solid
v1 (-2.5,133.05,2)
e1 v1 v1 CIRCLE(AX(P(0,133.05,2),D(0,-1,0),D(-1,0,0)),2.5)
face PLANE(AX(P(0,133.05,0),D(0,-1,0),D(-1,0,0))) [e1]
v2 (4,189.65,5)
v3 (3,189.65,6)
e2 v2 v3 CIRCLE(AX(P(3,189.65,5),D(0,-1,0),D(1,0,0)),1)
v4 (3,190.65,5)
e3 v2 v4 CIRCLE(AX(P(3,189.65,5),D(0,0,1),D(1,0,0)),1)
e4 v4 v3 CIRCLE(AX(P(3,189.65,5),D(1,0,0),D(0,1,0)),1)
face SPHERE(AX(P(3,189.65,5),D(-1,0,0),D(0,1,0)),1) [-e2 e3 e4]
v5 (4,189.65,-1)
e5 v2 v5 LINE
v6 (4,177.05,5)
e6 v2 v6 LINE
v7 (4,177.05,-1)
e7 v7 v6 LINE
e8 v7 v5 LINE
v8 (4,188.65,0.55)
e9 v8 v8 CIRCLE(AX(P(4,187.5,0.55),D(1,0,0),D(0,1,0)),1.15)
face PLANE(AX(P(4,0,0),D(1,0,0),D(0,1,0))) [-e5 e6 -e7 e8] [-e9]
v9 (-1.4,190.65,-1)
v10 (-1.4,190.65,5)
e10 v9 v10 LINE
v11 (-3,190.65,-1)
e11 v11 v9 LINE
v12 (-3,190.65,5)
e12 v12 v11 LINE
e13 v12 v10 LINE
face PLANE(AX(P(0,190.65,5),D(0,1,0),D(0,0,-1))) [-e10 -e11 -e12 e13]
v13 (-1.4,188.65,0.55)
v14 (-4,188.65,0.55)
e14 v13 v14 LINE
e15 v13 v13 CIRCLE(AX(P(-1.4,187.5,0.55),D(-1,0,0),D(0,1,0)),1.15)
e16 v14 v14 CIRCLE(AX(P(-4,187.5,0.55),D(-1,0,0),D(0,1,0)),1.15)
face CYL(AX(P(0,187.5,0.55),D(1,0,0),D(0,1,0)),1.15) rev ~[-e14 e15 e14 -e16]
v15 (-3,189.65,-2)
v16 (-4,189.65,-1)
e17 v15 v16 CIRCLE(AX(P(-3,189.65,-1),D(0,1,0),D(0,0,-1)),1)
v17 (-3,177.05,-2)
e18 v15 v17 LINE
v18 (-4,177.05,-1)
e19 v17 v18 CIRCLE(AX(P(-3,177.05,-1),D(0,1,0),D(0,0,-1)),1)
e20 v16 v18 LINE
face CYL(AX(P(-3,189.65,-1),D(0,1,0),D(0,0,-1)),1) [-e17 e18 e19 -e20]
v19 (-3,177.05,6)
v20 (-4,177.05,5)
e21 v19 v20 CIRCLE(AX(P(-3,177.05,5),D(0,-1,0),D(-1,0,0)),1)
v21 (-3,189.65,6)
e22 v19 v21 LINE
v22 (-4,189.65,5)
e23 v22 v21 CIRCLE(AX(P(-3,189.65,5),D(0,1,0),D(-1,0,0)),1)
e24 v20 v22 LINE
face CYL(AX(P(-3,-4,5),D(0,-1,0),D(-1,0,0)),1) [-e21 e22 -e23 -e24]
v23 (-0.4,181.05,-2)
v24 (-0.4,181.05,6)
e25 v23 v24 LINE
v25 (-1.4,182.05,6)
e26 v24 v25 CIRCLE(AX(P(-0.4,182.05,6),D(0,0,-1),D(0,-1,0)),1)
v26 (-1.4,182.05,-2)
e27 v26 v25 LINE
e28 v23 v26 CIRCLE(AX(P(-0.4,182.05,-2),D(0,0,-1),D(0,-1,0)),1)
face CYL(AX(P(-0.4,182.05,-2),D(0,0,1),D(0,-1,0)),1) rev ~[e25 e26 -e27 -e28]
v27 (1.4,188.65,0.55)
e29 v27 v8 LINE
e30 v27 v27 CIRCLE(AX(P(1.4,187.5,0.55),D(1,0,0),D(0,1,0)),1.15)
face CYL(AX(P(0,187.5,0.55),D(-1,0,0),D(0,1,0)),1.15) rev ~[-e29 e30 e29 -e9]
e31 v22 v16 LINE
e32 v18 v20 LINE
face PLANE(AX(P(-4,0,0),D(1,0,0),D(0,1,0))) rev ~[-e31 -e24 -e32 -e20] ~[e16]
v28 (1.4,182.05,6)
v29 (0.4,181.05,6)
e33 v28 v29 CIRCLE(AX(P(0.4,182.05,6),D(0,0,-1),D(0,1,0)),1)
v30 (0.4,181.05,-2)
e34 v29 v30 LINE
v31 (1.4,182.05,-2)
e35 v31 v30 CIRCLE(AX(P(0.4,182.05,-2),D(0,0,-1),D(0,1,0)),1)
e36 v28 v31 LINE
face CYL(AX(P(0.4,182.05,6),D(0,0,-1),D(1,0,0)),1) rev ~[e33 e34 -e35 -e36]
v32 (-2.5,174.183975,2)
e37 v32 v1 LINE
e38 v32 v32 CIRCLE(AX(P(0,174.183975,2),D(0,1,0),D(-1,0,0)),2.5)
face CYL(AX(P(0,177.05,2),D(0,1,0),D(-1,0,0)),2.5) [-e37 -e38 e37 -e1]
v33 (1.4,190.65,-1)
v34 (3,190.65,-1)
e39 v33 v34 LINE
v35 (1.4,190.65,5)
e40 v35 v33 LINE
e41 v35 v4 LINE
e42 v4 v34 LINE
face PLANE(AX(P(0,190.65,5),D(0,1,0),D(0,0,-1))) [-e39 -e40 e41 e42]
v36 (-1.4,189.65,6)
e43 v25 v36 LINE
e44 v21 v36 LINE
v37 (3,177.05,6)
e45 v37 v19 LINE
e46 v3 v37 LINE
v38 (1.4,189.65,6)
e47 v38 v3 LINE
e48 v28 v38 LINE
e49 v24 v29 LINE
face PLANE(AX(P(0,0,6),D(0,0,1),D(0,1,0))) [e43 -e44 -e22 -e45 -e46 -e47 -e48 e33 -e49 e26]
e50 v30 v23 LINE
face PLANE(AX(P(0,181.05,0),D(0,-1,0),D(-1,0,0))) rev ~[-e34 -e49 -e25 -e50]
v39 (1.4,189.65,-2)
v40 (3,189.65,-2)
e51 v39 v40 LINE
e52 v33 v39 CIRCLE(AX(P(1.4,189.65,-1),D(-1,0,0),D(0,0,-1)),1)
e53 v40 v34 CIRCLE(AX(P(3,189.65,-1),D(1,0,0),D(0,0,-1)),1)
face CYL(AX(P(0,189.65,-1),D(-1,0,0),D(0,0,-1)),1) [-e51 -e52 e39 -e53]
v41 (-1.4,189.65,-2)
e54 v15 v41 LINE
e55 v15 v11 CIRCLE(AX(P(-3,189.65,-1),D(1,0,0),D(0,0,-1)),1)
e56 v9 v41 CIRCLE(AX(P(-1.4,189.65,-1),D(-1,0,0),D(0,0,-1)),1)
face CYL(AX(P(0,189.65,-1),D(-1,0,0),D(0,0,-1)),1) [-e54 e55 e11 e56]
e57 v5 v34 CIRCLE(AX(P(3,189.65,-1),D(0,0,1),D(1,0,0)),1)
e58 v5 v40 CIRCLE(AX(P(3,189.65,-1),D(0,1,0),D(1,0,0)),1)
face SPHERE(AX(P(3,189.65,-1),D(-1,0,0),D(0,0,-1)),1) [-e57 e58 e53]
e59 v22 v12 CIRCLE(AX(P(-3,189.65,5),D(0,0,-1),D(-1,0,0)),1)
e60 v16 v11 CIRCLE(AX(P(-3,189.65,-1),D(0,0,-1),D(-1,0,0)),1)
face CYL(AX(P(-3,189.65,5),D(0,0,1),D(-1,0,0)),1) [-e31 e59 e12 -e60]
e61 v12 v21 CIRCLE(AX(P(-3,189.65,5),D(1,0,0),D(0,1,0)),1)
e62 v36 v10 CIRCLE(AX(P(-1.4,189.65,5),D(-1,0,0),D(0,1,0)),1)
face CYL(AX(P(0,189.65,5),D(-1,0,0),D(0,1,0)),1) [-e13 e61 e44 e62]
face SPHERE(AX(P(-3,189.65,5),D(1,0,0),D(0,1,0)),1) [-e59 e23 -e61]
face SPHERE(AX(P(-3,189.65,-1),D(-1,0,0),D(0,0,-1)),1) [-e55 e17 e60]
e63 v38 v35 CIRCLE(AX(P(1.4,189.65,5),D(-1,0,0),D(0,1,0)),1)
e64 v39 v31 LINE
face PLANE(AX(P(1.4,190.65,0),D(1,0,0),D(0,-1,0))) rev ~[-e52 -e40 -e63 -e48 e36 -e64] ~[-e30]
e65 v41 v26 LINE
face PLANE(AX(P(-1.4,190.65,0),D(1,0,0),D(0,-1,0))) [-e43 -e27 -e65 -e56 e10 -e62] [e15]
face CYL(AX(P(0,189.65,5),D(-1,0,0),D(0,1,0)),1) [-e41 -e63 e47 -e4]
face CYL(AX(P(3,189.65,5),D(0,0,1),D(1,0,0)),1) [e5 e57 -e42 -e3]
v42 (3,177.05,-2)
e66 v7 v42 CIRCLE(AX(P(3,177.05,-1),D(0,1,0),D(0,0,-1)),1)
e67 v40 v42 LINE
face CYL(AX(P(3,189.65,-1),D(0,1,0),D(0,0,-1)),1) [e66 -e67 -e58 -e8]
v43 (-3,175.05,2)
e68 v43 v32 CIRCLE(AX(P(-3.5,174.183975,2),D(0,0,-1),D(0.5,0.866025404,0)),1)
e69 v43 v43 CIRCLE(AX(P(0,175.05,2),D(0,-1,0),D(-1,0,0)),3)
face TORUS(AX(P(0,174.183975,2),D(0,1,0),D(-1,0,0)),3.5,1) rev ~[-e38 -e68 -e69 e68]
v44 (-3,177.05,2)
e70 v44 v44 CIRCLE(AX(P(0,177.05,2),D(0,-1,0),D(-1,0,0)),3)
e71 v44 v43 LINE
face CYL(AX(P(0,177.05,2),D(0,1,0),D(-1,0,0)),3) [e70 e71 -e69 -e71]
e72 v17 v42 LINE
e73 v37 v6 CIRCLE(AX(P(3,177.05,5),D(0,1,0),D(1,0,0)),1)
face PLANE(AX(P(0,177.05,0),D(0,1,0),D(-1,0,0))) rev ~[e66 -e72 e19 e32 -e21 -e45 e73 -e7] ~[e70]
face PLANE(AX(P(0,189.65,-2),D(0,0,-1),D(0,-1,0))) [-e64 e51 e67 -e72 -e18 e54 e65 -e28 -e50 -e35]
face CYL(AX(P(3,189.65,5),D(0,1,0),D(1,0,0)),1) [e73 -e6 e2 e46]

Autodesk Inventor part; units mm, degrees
ref_plane "YZ Plane" through (0, 0, 0) normal (1, 0, 0) x (0, 1, 0)
ref_plane "XY Plane" through (0, 0, 0) normal (0, 0, 1) x (1, 0, 0)
sketch "Boceto1" plane through (0, 0, 0) normal (1, 0, 0) x (0, 1, 0)
  circle A0 centre (0, 0) radius 5
  line L0 (0, 0) -> (0, 6)
  line L1 (0, 6) -> (-4, 6)
  line L2 (-5, 5) -> (-5, 0)
  line L3 (0, 6) -> (181.05, 6)
  line L4 (181.05, 6) -> (187.5, 6)
  line L5 (187.5, 6) -> (189.65, 6)
  line L6 (190.65, 5) -> (190.65, -1)
  line L7 (189.65, -2) -> (4.5826, -2)
  arc A1 (-4, 6) -> (-5, 5) centre (-4, 5) ccw
  arc A2 (190.65, 5) -> (189.65, 6) centre (189.65, 5) ccw
  arc A3 (189.65, -2) -> (190.65, -1) centre (189.65, -1) ccw
  line L8 (3.5707, -3.5) -> (-3.5707, -3.5)
  point P0 (-5, 6)
  point P1 (190.65, 6)
  point P2 (190.65, -2)
  dimension "d0" = 10
  dimension "d1" = 6
  dimension "d2" = 5
  dimension "d3" = 181.05
  dimension "d4" = 6.45
  dimension "d5" = 3.15
  dimension "d6" = 8
  dimension "d7" = 1
  dimension "d8" = 1
  dimension "d45" = 1.5
extrude "Extrusión1" add sketch "Boceto1" along normal mid plane 8 contours A0 L8 | L2 A1 L1 L0 A0 | L0 L3 L4 L5 A2 L6 A3 L7 A0 picked at (0, -0.6667)
fillet "Empalme1" radius 1 18 edges at (-4, 190.3571, 5.7071) (-4, 190.65, 2) (-4, 190.3571, -1.7071) (-4, 97.1163, -2) (-4, -4.7071, 5.7071) (-4, -5, 2.5) (-4, -4.6289, -1.8903) (-4, 4.1451, -2.7962) (-4, 92.825, 6) (4, -4.7071, 5.7071) (4, -5, 2.5) (4, -4.6289, -1.8903) (4, 4.1451, -2.7962) (4, 190.3571, 5.7071) (4, 190.65, 2) (4, 190.3571, -1.7071) (4, 97.1163, -2) (4, 92.825, 6)
sketch "Boceto2" plane through (-4, 0, 0) normal (-1, 0, 0) x (0, 0, 1)
  circle A0 centre (0, 0) radius 5.5
  line L0 (4.7631, 2.75) -> (-2, 14.4641)
  line L1 (-2, 189.65) -> (-2, 4.5826) projected
  line L2 (5.5, 0) -> (5.5, -5.5)
  line L3 (0, -5) -> (5, -5) projected
  line L4 (0, -5.5) -> (5.5, -5.5)
  line L5 (-2, 14.4641) -> (-2, 5.1235)
  dimension "d12" = 11
  dimension "d13" = 30
extrude "Extrusión2" cut sketch "Boceto2" against normal blind 2.5
sketch "Boceto3" plane through (0, 0, 0) normal (0, 0, 1) x (1, 0, 0)
  line L0 (-3, 190.65) -> (3, 190.65) projected
  line L1 (0, 190.65) -> (0, 181.05)
  line L2 (1.4, 190.65) -> (1.4, 181.05)
  line L3 (-1.4, 190.65) -> (-1.4, 181.05)
  line L4 (1.4, 190.65) -> (-1.4, 190.65)
  line L5 (0, 181.05) -> (1.4, 181.05)
  line L6 (0, 181.05) -> (-1.4, 181.05)
  point P0 (0, 0)
  dimension "d16" = 9.6
  dimension "d17" = 1.4
  dimension "d18" = 1.4
extrude "Extrusión3" cut sketch "Boceto3" along normal mid plane 16
fillet "Empalme4" radius 1 2 edges at (-1.4, 181.05, 2) (1.4, 181.05, 2)
sketch "Boceto11" plane through (0, 0, 0) normal (1, 0, 0) x (0, 1, 0)
  line L0 (0, 0) -> (0, 6)
  line L1 (0, 6) -> (181.05, 6)
  line L2 (189.65, 6) -> (-4, 6) projected
  line L3 (181.05, 6) -> (187.5, 6)
  line L4 (187.5, 6) -> (187.5, 0.55)
  circle A0 centre (187.5, 0.55) radius 1.15
  dimension "d66" = 6
  dimension "d67" = 181.05
  dimension "d68" = 6.45
  dimension "d69" = 5.45
  dimension "d70" = 2.3
extrude "Extrusión9" cut sketch "Boceto11" along normal through all both and the other way through all
sketch "Boceto6" plane through (0, 0, 0) normal (0, 0, 1) x (1, 0, 0)
  line L0 (0, 0) -> (-1.5, 0)
  line L1 (-1.5, 0) -> (-1.5, -3)
  line L2 (-1.5, -5) -> (-1.5, 4.5826) projected
  line L3 (-1.5, -3) -> (-4.5, -3)
  line L4 (-1.5, 0) -> (-9.5, 0)
  line L5 (-4.5, -3) -> (-4.5, -3.5)
  line L6 (-9.5, 0) -> (-9.5, -2.3732)
  line L7 (-9.5, -2.3732) -> (-4.5, -3.5)
  dimension "d27" = 1.5
  dimension "d28" = 3
  dimension "d29" = 3
  dimension "d30" = 8
  dimension "d31" = 0.5
  dimension "d32" = 2.3732
revolve "Revolución1" add sketch "Boceto6" angle 360 about axis through (-1.5, 0, 0) along (-1, 0, 0)
sketch "Boceto7" plane through (0, 0, 0) normal (0, 0, 1) x (1, 0, 0)
  line L0 (0, 0) -> (-1.5, 0)
  line L1 (-1.5, 0) -> (-4.5, 0)
  line L2 (-4.5, 0) -> (-9.5, 0)
  line L3 (-9.5, 0) -> (-9.5, -1)
  line L4 (-9.5, 2.3732) -> (-9.5, -2.3732) projected
  line L5 (-9.5, -1) -> (-2.5, -1)
  line L6 (-2.5, -1) -> (-2.5, 1)
  line L7 (-2.5, 1) -> (-9.5, 1)
  line L8 (-9.5, 1) -> (-9.5, 0)
  point P0 (-9.5, 1)
  dimension "d34" = 1.5
  dimension "d35" = 3
  dimension "d36" = 5
  dimension "d37" = 1
  dimension "d38" = 7
  dimension "d39" = 2
extrude "Extrusión5" cut sketch "Boceto7" along normal mid plane 7
fillet "Empalme2" radius 1 2 edges at (-2.5, -1, 0) (-2.5, 1, 0)
ref_plane "Plano de trabajo2" through (0, 177.05, 0) normal (0, 1, 0) x (-1, 0, 0)
sketch "Boceto8" plane through (0, 177.05, 0) normal (0, 1, 0) x (-1, 0, 0)
  line L0 (0, 0) -> (0, 2)
  line L1 (16, 18) -> (-16, 18)
  line L2 (-16, 18) -> (-16, -14)
  line L3 (-16, -14) -> (16, -14)
  line L4 (16, -14) -> (16, 18)
  line L5 (16, 18) -> (-16, -14) construction
  line L6 (-16, 18) -> (16, -14) construction
  point P0 (0, 0)
  dimension "d49" = 2
  dimension "d50" = 32
  dimension "d51" = 32
  dimension "d78" = 0
extrude "Extrusión6" cut sketch "Boceto8" against normal blind 362.1
sketch "Boceto9" plane through (0, 177.05, 0) normal (0, -1, 0) x (-1, 0, 0)
  line L0 (3, -6) -> (-3, -6) projected
  line L1 (0, 0) -> (0, -2)
  circle A0 centre (0, -2) radius 2.5
  point P0 (0, 0)
  point P1 (-2.6, -6)
  dimension "d55" = 2
  dimension "d56" = 5
  dimension "d79" = 0
  dimension "d80" = 0
extrude "Extrusión7" add sketch "Boceto9" along normal blind 44
sketch "Boceto10" plane through (0, 177.05, 0) normal (0, -1, 0) x (-1, 0, 0)
  circle A0 centre (0, -2) radius 2.5 projected
  circle A1 centre (0, -2) radius 3
  point P0 (0, 0)
  dimension "d59" = 6
extrude "Extrusión8" add sketch "Boceto10" along normal blind 2 contours A0 | A1
fillet "Empalme3" radius 1 1 edges at (2.5, 175.05, 2)
equation "\"d0\" = width_r3"
equation "\"d1\" = 0.5 * width_r3 + offset"
equation "\"d2\" = 0.5 * width_r3"
equation "\"d3\" = lenght_body_link - 0.5 * width_r3"
equation "\"d4\" = shaft_y"
equation "\"d5\" = 0.5 * Djoint_shaft + 2 * offset"
equation "\"d6\" = width_link"
equation "\"d45\" = 1.5 * offset"
equation "\"d9\" = width_link"
equation "\"d12\" = width_r3 + offset"
equation "\"d14\" = 0.5 * width_link - 0.5 * t_thikness"
equation "\"d16\" = 0.5 * Djoint_shaft + 2 * offset + shaft_y"
equation "\"d17\" = 0.25 * offset + 0.5 * wire_D"
equation "\"d18\" = 0.25 * offset + 0.5 * wire_D"
equation "\"d19\" = 2 * width_link"
equation "\"d63\" = offset"
equation "\"d27\" = 0.5 * t_thikness"
equation "\"d28\" = 0.5 * sj_diam_shaft"
equation "\"d29\" = t_thikness"
equation "\"d30\" = t_thikness + sj_head_height"
equation "\"d31\" = 0.5 * sj_head_D - 0.5 * sj_diam_shaft"
equation "\"d32\" = 0.5 * sj_head_d"
equation "\"d34\" = 0.5 * t_thikness"
equation "\"d35\" = t_thikness"
equation "\"d36\" = sj_head_height"
equation "\"d37\" = 0.5 * sj_groove"
equation "\"d38\" = sj_groove_deep"
equation "\"d39\" = sj_groove"
equation "\"d40\" = sj_head_D"
equation "\"d46\" = 0.5 * sj_groove"
equation "\"d56\" = spring_int_d - offset"
equation "\"d59\" = spring_int_d"
equation "\"d60\" = thikness"
equation "\"d62\" = offset"
equation "\"offset\" = 1"
equation "\"wire_D\" = 2.3"
equation "\"width_link\" = 8"
equation "\"Djoint_shaft\" = 2.3"
equation "\"shaft_x\" = 1.45"
equation "\"shaft_y\" = 6.45"
equation "\"lenght_body_link\" = 186.05"
equation "\"m2_theta3f\" = -60deg"
equation "\"width_r3\" = 10"
equation "\"t_thikness\" = 3"
equation "\"sj_diam_shaft\" = 6"
equation "\"sj_groove\" = 2"
equation "\"sj_groove_deep\" = 7"
equation "\"sj_head_D\" = 7"
equation "\"sj_head_d\" = 4.7464"
equation "\"sj_head_height\" = 5"
equation "\"thikness\" = 2"
equation "\"spring_int_d\" = 6"
equation "\"spring_lenght\" = 28"
equation "\"r1\" = 5.55"
equation "\"r2o\" = 59.75"
equation "\"delta_y\" = 6"
equation "\"wire_d\" = 1"
equation "\"width_ang_spring\" = 5"
equation "\"spring_int_diam\" = 8.5"
equation "\"spring_ext_diam\" = 10.5"
equation "\"r3\" = 8.25"
equation "\"r3R\" = 4.75"
equation "\"r3T\" = 6.74537"
equation "\"alpha\" = 54.847297deg"
equation "\"alpha2\" = 270deg"
equation "\"theta3_recogido\" = 305.152703deg"
equation "\"delta_theta_3\" = 45deg"
equation "\"joint_width\" = 12"
equation "\"joint_radius\" = 7.75"
equation "\"shaft_width\" = 15"
equation "\"shaft_joint_diameter\" = 7.75"
equation "\"separation_space\" = 0.5"
equation "\"height_finger\" = 42"
equation "\"cell_screw_head_diameter\" = 4"
equation "\"cell_screw_diameter\" = 2"
equation "\"cell_space\" = 2"
equation "\"cell_width\" = 6"
equation "\"cell_theta_position\" = 60deg"
equation "\"cell_thikness\" = 1"
equation "\"cell_lenght\" = 37"
equation "\"cell_z_space\" = 5"
equation "\"Dt\" = 1.05949"
equation "\"lenght_bar_support\" = 201.65"
equation "\"wire_spring_d\" = 1"
equation "\"trigger_offset\" = 2"
equation "\"m2_theta2o\" = 107deg"
equation "\"m2_r2\" = 28"
equation "\"e\" = 9"
equation "\"So\" = 17"
equation "\"m2_theta3o\" = -30deg"
equation "\"m2_r3\" = 19.75"
equation "\"m2_delta_theta1\" = 15deg"
equation "\"trigger_thumb_lenght\" = 6"
equation "\"width_r12\" = 8"
equation "\"m2_r1\" = 25.2"
equation "\"r3_thikness\" = 3.5"
equation "\"tg_width\" = 4"
equation "\"pivot_screw_d\" = 4"
equation "\"pivot_diameter\" = 7"
equation "\"sf_lenght\" = 9.5"
equation "\"sf_base\" = 3"
equation "\"sf_head_height\" = 3"
equation "\"sf_head_width\" = 4.5"
equation "\"sf_head_offset\" = 0.25"
equation "\"sf_head_grip_width\" = 2"
equation "\"sf_head_angle\" = 45deg"
equation "\"sf_thikness\" = 5"
equation "\"screw_Dhead\" = 8"
equation "\"screw_d\" = 4"
equation "\"screw_lenght\" = 12"
equation "\"screwJ_base_D\" = 9"
equation "\"screwJ_top_D\" = 13"
equation "\"gj_D\" = 6"
equation "\"gj_d\" = 4"
equation "\"gj_out_section\" = 6"
equation "\"agarradera_theta\" = 60deg"
equation "\"agarradera_width\" = 4"
equation "\"sfbox_theta1\" = 60deg"
equation "\"sfbox_theta2\" = 45deg"
equation "\"position\" = 39.13077"
equation "\"fat_width_slider\" = 2"
equation "\"sfbox_tip_width\" = 2.5"
equation "\"flex_separation_theta\" = 60deg"
equation "\"sf_flex_separation\" = 38.66667"
equation "\"ext_width_slider\" = 3.5"
equation "\"sf_box_width\" = 1.5"
equation "\"slim_width_slider\" = 1.5"
equation "\"sfbox_width\" = 1.5"
equation "\"int_width_slider\" = 2"
equation "\"box_fat_slider_lenght\" = 67"
equation "\"box_slim_slider_lenght\" = 116"
equation "\"thikness_box\" = 1.5"
equation "\"box_in_height\" = 35"
equation "\"box_in_width\" = 72"
equation "\"box_in_deep\" = 77"
equation "\"agarradera_position\" = 82.13077"
properties part number "Eslabón conector M1" material "Plástico PPS"
